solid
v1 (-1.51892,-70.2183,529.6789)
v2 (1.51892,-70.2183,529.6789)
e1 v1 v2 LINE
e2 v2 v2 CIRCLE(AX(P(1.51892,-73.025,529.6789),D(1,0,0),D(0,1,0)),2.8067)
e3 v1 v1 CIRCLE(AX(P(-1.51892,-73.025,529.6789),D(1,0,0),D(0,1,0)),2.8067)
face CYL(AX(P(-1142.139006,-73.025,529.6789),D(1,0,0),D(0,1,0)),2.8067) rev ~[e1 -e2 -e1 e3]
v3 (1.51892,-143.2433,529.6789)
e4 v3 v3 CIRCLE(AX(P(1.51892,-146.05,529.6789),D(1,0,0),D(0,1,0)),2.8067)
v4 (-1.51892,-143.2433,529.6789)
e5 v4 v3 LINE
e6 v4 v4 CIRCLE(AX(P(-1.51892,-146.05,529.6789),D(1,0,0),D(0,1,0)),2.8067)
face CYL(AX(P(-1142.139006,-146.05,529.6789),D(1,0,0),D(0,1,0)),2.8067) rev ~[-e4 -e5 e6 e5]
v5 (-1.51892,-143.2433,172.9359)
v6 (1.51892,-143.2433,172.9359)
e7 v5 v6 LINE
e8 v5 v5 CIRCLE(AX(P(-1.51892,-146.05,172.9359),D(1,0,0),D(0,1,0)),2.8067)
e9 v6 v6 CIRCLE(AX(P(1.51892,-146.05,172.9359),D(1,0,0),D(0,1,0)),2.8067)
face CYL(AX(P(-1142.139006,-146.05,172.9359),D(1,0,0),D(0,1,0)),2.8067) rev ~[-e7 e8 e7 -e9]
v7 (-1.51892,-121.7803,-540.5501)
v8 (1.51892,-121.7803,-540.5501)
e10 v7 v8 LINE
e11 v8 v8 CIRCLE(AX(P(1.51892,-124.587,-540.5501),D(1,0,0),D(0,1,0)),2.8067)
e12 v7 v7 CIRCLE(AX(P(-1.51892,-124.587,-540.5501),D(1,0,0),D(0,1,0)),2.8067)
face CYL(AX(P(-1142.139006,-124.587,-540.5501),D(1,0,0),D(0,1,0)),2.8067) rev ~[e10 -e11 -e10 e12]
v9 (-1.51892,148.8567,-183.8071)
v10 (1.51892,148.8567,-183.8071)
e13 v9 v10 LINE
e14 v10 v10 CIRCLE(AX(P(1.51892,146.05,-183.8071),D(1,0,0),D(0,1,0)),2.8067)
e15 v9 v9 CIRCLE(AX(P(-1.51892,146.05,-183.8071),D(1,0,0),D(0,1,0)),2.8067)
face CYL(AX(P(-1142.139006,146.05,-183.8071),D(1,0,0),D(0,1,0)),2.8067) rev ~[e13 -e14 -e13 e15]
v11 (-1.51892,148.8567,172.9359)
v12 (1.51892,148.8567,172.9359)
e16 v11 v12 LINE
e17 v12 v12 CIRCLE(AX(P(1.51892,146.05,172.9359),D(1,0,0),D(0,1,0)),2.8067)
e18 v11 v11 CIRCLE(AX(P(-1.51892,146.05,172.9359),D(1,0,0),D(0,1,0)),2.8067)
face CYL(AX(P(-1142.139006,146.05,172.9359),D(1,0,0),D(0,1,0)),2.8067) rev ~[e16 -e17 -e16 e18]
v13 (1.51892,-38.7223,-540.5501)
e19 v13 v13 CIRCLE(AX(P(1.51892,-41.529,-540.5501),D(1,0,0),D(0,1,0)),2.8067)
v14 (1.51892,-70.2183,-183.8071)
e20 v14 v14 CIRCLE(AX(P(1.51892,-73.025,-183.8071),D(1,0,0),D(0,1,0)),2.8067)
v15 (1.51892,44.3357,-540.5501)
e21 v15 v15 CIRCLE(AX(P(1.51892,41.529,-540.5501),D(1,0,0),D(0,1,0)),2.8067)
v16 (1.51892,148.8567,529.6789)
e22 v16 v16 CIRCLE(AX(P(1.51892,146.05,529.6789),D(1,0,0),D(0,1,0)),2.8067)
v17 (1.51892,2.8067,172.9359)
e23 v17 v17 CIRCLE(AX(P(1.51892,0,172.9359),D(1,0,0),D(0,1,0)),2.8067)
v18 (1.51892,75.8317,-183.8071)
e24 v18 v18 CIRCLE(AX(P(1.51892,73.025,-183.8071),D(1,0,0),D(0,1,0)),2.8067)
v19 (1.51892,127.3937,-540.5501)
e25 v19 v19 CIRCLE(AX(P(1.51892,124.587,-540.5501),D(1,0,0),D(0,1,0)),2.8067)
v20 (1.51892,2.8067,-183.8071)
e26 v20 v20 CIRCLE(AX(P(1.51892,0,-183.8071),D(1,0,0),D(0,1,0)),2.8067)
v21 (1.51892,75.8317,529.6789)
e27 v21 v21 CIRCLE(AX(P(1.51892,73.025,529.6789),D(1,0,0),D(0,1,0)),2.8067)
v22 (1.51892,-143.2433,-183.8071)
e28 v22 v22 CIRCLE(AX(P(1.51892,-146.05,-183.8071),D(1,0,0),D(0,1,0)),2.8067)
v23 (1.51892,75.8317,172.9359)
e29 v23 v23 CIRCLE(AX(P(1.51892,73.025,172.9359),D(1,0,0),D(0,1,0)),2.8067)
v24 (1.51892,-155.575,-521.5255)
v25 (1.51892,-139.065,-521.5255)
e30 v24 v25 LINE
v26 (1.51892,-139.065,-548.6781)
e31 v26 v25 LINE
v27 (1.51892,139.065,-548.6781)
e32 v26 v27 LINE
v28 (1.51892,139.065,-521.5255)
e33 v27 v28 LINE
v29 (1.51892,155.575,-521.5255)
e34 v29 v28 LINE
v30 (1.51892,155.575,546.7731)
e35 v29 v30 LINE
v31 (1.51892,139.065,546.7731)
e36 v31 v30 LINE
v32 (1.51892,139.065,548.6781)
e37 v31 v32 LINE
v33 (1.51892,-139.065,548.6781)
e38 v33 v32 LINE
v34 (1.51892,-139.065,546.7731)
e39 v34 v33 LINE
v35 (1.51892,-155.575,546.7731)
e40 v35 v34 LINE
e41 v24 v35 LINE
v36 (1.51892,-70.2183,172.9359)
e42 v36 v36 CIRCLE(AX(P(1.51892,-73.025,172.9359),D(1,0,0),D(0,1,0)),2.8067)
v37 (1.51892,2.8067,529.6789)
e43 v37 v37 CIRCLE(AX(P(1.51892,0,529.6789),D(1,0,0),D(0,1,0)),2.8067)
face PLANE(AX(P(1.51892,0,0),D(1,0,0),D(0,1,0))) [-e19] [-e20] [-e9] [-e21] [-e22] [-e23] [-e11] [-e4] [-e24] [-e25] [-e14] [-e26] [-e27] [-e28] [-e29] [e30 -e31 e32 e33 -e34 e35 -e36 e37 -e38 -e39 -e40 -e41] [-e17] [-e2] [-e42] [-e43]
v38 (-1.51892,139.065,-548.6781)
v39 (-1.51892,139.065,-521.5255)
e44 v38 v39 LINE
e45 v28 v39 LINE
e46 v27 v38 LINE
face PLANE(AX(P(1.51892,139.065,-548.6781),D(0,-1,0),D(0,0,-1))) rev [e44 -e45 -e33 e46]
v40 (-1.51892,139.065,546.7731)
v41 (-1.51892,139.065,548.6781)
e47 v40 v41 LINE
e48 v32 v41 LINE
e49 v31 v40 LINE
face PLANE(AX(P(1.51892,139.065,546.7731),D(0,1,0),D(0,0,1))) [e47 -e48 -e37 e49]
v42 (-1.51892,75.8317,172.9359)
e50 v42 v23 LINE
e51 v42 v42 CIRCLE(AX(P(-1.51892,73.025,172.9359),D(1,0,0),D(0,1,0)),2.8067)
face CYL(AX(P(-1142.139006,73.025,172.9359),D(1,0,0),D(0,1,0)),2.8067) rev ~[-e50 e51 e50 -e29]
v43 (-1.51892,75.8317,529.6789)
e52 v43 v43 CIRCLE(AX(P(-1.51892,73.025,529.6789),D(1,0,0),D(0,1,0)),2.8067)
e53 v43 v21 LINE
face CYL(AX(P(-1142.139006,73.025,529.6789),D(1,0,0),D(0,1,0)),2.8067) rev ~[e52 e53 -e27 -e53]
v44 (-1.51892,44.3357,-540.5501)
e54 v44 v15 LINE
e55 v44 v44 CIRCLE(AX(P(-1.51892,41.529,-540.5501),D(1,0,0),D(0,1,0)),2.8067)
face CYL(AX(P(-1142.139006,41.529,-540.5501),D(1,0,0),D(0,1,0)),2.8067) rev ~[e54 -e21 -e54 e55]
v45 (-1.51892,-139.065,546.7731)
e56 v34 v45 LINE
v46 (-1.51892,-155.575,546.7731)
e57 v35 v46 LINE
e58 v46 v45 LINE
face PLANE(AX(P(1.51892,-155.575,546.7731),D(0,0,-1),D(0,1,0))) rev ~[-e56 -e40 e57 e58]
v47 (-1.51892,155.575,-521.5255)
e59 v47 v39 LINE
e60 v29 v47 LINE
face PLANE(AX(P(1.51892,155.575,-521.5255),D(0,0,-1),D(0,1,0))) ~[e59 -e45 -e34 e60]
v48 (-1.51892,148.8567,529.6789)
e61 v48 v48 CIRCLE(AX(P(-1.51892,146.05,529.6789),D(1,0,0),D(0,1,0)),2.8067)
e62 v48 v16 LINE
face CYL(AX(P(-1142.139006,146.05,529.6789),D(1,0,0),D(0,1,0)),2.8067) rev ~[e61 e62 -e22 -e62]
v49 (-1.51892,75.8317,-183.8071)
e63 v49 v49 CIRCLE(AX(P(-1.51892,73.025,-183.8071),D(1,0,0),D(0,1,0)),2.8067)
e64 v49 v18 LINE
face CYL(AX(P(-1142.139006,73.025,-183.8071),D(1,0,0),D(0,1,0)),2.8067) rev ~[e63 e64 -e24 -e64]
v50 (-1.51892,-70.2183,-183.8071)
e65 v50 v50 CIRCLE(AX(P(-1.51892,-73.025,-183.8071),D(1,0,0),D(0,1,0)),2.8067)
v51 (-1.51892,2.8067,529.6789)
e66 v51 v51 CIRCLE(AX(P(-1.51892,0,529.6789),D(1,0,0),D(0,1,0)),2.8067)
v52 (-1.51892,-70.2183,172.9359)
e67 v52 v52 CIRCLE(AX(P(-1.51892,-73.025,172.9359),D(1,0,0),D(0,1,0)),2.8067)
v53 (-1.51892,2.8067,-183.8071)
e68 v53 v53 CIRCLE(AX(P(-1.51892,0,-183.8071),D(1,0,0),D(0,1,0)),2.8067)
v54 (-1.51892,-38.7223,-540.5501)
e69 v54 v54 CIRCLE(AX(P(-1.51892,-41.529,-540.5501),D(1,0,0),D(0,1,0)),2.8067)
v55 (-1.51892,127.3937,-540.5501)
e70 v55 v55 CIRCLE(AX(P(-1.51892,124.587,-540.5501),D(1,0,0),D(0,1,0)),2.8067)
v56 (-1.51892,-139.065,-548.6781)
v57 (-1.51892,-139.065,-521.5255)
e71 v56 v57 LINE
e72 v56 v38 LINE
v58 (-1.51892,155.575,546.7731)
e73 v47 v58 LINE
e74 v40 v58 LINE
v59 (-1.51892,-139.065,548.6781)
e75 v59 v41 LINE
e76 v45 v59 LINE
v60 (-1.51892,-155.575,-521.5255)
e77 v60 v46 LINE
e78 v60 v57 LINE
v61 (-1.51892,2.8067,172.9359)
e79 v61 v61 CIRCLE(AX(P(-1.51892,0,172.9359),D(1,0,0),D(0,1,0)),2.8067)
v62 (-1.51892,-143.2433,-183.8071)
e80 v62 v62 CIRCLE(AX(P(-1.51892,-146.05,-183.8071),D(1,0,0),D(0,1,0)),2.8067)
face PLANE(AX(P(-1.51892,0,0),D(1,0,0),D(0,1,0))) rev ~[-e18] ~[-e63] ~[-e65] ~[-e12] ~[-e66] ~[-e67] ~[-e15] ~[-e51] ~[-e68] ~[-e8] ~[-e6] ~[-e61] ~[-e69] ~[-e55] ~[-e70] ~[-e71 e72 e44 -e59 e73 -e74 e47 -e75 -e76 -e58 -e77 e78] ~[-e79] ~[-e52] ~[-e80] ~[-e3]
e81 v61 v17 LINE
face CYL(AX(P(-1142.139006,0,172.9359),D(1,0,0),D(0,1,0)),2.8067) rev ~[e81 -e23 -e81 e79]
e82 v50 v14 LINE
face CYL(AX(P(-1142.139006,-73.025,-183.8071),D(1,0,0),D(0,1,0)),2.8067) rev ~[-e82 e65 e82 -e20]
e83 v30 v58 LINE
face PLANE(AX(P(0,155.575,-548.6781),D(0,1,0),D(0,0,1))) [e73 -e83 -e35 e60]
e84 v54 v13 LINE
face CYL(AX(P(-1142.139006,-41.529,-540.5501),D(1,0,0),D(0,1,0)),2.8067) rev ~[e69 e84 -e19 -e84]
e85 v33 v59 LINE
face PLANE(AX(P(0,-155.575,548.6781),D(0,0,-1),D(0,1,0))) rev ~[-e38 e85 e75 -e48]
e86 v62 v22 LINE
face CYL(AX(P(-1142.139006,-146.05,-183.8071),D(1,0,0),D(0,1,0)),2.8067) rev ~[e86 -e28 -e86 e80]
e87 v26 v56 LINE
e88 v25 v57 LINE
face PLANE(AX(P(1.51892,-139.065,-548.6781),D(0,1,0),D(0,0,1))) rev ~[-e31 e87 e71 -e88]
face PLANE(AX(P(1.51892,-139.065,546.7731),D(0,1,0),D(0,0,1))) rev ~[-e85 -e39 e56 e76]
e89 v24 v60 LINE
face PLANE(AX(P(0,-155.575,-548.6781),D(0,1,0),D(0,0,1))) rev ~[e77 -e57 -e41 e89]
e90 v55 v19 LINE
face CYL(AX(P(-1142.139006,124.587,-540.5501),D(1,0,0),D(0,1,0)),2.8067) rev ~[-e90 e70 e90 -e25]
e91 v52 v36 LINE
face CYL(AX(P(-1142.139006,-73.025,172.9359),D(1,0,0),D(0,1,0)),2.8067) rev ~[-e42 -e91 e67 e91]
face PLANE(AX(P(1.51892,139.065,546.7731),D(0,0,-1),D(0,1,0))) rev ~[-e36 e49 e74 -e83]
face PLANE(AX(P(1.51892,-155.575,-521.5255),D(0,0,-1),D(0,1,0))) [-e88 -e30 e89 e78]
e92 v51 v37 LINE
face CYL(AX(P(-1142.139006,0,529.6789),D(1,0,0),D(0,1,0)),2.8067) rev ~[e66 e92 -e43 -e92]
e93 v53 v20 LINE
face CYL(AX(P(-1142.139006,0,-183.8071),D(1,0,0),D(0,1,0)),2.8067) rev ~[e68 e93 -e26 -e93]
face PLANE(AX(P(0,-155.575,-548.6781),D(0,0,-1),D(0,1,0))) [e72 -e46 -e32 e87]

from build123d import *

# Parameters (mm, degrees)
F0_W     = 311.15
F0_H     = 1097.3562
F1_DEPTH = 1.51892
F2_W     = 16.51
F2_H     = 27.1526
F3_DEPTH = 3.03784
F4_W     = 16.51
F4_H     = 1.905
F5_DEPTH = 3.03784
F7_D     = 5.6134


# Not quite as in the source:
# - a pattern or mirror of a feature is missing from the dataset's text; its kind, count and spacing are read off the source's solid
# - a feature names something its author has since deleted; it is built from what else it names


with BuildPart() as f1:
    # F0 (on Right) → F1 (new body, symmetric)
    with BuildSketch(Plane.YZ):
        Rectangle(F0_W, F0_H)
    extrude(amount=F1_DEPTH, both=True)

    # F2 (on face) → F3 (cut, through all)
    with BuildSketch(Plane.YZ.offset(1.51892)):
        with Locations((-147.32, -535.1018)):
            Rectangle(F2_W, F2_H)
    f3 = extrude(amount=-F3_DEPTH, mode=Mode.SUBTRACT)

    # F3_copies: F3 across plane
    add(f3.mirror(Plane.ZX), mode=Mode.SUBTRACT)

    # F4 (on face) → F5 (cut, through all)
    with BuildSketch(Plane.YZ.offset(1.51892)):
        with Locations((-147.32, 547.7256)):
            Rectangle(F4_W, F4_H)
        with Locations((147.32, 547.7256)):
            Rectangle(F4_W, F4_H)
    extrude(amount=-F5_DEPTH, mode=Mode.SUBTRACT)

    # F7 (through all)
    with Locations(Plane(origin=(-1.51892, 0, 0), x_dir=(0, -1, 0), z_dir=(-1, 0, 0))):
        with Locations((124.587, -540.5501), (41.529, -540.5501), (-41.529, -540.5501), (-124.587, -540.5501), (146.05, -183.8071), (146.05, 172.9359), (73.025, 172.9359), (0, 172.9359), (-73.025, 172.9359), (-146.05, 172.9359), (-146.05, -183.8071), (-73.025, -183.8071), (0, -183.8071), (73.025, -183.8071), (146.05, 529.6789), (73.025, 529.6789), (0, 529.6789), (-73.025, 529.6789), (-146.05, 529.6789)):
            Hole(F7_D / 2)


solid = f1.part
